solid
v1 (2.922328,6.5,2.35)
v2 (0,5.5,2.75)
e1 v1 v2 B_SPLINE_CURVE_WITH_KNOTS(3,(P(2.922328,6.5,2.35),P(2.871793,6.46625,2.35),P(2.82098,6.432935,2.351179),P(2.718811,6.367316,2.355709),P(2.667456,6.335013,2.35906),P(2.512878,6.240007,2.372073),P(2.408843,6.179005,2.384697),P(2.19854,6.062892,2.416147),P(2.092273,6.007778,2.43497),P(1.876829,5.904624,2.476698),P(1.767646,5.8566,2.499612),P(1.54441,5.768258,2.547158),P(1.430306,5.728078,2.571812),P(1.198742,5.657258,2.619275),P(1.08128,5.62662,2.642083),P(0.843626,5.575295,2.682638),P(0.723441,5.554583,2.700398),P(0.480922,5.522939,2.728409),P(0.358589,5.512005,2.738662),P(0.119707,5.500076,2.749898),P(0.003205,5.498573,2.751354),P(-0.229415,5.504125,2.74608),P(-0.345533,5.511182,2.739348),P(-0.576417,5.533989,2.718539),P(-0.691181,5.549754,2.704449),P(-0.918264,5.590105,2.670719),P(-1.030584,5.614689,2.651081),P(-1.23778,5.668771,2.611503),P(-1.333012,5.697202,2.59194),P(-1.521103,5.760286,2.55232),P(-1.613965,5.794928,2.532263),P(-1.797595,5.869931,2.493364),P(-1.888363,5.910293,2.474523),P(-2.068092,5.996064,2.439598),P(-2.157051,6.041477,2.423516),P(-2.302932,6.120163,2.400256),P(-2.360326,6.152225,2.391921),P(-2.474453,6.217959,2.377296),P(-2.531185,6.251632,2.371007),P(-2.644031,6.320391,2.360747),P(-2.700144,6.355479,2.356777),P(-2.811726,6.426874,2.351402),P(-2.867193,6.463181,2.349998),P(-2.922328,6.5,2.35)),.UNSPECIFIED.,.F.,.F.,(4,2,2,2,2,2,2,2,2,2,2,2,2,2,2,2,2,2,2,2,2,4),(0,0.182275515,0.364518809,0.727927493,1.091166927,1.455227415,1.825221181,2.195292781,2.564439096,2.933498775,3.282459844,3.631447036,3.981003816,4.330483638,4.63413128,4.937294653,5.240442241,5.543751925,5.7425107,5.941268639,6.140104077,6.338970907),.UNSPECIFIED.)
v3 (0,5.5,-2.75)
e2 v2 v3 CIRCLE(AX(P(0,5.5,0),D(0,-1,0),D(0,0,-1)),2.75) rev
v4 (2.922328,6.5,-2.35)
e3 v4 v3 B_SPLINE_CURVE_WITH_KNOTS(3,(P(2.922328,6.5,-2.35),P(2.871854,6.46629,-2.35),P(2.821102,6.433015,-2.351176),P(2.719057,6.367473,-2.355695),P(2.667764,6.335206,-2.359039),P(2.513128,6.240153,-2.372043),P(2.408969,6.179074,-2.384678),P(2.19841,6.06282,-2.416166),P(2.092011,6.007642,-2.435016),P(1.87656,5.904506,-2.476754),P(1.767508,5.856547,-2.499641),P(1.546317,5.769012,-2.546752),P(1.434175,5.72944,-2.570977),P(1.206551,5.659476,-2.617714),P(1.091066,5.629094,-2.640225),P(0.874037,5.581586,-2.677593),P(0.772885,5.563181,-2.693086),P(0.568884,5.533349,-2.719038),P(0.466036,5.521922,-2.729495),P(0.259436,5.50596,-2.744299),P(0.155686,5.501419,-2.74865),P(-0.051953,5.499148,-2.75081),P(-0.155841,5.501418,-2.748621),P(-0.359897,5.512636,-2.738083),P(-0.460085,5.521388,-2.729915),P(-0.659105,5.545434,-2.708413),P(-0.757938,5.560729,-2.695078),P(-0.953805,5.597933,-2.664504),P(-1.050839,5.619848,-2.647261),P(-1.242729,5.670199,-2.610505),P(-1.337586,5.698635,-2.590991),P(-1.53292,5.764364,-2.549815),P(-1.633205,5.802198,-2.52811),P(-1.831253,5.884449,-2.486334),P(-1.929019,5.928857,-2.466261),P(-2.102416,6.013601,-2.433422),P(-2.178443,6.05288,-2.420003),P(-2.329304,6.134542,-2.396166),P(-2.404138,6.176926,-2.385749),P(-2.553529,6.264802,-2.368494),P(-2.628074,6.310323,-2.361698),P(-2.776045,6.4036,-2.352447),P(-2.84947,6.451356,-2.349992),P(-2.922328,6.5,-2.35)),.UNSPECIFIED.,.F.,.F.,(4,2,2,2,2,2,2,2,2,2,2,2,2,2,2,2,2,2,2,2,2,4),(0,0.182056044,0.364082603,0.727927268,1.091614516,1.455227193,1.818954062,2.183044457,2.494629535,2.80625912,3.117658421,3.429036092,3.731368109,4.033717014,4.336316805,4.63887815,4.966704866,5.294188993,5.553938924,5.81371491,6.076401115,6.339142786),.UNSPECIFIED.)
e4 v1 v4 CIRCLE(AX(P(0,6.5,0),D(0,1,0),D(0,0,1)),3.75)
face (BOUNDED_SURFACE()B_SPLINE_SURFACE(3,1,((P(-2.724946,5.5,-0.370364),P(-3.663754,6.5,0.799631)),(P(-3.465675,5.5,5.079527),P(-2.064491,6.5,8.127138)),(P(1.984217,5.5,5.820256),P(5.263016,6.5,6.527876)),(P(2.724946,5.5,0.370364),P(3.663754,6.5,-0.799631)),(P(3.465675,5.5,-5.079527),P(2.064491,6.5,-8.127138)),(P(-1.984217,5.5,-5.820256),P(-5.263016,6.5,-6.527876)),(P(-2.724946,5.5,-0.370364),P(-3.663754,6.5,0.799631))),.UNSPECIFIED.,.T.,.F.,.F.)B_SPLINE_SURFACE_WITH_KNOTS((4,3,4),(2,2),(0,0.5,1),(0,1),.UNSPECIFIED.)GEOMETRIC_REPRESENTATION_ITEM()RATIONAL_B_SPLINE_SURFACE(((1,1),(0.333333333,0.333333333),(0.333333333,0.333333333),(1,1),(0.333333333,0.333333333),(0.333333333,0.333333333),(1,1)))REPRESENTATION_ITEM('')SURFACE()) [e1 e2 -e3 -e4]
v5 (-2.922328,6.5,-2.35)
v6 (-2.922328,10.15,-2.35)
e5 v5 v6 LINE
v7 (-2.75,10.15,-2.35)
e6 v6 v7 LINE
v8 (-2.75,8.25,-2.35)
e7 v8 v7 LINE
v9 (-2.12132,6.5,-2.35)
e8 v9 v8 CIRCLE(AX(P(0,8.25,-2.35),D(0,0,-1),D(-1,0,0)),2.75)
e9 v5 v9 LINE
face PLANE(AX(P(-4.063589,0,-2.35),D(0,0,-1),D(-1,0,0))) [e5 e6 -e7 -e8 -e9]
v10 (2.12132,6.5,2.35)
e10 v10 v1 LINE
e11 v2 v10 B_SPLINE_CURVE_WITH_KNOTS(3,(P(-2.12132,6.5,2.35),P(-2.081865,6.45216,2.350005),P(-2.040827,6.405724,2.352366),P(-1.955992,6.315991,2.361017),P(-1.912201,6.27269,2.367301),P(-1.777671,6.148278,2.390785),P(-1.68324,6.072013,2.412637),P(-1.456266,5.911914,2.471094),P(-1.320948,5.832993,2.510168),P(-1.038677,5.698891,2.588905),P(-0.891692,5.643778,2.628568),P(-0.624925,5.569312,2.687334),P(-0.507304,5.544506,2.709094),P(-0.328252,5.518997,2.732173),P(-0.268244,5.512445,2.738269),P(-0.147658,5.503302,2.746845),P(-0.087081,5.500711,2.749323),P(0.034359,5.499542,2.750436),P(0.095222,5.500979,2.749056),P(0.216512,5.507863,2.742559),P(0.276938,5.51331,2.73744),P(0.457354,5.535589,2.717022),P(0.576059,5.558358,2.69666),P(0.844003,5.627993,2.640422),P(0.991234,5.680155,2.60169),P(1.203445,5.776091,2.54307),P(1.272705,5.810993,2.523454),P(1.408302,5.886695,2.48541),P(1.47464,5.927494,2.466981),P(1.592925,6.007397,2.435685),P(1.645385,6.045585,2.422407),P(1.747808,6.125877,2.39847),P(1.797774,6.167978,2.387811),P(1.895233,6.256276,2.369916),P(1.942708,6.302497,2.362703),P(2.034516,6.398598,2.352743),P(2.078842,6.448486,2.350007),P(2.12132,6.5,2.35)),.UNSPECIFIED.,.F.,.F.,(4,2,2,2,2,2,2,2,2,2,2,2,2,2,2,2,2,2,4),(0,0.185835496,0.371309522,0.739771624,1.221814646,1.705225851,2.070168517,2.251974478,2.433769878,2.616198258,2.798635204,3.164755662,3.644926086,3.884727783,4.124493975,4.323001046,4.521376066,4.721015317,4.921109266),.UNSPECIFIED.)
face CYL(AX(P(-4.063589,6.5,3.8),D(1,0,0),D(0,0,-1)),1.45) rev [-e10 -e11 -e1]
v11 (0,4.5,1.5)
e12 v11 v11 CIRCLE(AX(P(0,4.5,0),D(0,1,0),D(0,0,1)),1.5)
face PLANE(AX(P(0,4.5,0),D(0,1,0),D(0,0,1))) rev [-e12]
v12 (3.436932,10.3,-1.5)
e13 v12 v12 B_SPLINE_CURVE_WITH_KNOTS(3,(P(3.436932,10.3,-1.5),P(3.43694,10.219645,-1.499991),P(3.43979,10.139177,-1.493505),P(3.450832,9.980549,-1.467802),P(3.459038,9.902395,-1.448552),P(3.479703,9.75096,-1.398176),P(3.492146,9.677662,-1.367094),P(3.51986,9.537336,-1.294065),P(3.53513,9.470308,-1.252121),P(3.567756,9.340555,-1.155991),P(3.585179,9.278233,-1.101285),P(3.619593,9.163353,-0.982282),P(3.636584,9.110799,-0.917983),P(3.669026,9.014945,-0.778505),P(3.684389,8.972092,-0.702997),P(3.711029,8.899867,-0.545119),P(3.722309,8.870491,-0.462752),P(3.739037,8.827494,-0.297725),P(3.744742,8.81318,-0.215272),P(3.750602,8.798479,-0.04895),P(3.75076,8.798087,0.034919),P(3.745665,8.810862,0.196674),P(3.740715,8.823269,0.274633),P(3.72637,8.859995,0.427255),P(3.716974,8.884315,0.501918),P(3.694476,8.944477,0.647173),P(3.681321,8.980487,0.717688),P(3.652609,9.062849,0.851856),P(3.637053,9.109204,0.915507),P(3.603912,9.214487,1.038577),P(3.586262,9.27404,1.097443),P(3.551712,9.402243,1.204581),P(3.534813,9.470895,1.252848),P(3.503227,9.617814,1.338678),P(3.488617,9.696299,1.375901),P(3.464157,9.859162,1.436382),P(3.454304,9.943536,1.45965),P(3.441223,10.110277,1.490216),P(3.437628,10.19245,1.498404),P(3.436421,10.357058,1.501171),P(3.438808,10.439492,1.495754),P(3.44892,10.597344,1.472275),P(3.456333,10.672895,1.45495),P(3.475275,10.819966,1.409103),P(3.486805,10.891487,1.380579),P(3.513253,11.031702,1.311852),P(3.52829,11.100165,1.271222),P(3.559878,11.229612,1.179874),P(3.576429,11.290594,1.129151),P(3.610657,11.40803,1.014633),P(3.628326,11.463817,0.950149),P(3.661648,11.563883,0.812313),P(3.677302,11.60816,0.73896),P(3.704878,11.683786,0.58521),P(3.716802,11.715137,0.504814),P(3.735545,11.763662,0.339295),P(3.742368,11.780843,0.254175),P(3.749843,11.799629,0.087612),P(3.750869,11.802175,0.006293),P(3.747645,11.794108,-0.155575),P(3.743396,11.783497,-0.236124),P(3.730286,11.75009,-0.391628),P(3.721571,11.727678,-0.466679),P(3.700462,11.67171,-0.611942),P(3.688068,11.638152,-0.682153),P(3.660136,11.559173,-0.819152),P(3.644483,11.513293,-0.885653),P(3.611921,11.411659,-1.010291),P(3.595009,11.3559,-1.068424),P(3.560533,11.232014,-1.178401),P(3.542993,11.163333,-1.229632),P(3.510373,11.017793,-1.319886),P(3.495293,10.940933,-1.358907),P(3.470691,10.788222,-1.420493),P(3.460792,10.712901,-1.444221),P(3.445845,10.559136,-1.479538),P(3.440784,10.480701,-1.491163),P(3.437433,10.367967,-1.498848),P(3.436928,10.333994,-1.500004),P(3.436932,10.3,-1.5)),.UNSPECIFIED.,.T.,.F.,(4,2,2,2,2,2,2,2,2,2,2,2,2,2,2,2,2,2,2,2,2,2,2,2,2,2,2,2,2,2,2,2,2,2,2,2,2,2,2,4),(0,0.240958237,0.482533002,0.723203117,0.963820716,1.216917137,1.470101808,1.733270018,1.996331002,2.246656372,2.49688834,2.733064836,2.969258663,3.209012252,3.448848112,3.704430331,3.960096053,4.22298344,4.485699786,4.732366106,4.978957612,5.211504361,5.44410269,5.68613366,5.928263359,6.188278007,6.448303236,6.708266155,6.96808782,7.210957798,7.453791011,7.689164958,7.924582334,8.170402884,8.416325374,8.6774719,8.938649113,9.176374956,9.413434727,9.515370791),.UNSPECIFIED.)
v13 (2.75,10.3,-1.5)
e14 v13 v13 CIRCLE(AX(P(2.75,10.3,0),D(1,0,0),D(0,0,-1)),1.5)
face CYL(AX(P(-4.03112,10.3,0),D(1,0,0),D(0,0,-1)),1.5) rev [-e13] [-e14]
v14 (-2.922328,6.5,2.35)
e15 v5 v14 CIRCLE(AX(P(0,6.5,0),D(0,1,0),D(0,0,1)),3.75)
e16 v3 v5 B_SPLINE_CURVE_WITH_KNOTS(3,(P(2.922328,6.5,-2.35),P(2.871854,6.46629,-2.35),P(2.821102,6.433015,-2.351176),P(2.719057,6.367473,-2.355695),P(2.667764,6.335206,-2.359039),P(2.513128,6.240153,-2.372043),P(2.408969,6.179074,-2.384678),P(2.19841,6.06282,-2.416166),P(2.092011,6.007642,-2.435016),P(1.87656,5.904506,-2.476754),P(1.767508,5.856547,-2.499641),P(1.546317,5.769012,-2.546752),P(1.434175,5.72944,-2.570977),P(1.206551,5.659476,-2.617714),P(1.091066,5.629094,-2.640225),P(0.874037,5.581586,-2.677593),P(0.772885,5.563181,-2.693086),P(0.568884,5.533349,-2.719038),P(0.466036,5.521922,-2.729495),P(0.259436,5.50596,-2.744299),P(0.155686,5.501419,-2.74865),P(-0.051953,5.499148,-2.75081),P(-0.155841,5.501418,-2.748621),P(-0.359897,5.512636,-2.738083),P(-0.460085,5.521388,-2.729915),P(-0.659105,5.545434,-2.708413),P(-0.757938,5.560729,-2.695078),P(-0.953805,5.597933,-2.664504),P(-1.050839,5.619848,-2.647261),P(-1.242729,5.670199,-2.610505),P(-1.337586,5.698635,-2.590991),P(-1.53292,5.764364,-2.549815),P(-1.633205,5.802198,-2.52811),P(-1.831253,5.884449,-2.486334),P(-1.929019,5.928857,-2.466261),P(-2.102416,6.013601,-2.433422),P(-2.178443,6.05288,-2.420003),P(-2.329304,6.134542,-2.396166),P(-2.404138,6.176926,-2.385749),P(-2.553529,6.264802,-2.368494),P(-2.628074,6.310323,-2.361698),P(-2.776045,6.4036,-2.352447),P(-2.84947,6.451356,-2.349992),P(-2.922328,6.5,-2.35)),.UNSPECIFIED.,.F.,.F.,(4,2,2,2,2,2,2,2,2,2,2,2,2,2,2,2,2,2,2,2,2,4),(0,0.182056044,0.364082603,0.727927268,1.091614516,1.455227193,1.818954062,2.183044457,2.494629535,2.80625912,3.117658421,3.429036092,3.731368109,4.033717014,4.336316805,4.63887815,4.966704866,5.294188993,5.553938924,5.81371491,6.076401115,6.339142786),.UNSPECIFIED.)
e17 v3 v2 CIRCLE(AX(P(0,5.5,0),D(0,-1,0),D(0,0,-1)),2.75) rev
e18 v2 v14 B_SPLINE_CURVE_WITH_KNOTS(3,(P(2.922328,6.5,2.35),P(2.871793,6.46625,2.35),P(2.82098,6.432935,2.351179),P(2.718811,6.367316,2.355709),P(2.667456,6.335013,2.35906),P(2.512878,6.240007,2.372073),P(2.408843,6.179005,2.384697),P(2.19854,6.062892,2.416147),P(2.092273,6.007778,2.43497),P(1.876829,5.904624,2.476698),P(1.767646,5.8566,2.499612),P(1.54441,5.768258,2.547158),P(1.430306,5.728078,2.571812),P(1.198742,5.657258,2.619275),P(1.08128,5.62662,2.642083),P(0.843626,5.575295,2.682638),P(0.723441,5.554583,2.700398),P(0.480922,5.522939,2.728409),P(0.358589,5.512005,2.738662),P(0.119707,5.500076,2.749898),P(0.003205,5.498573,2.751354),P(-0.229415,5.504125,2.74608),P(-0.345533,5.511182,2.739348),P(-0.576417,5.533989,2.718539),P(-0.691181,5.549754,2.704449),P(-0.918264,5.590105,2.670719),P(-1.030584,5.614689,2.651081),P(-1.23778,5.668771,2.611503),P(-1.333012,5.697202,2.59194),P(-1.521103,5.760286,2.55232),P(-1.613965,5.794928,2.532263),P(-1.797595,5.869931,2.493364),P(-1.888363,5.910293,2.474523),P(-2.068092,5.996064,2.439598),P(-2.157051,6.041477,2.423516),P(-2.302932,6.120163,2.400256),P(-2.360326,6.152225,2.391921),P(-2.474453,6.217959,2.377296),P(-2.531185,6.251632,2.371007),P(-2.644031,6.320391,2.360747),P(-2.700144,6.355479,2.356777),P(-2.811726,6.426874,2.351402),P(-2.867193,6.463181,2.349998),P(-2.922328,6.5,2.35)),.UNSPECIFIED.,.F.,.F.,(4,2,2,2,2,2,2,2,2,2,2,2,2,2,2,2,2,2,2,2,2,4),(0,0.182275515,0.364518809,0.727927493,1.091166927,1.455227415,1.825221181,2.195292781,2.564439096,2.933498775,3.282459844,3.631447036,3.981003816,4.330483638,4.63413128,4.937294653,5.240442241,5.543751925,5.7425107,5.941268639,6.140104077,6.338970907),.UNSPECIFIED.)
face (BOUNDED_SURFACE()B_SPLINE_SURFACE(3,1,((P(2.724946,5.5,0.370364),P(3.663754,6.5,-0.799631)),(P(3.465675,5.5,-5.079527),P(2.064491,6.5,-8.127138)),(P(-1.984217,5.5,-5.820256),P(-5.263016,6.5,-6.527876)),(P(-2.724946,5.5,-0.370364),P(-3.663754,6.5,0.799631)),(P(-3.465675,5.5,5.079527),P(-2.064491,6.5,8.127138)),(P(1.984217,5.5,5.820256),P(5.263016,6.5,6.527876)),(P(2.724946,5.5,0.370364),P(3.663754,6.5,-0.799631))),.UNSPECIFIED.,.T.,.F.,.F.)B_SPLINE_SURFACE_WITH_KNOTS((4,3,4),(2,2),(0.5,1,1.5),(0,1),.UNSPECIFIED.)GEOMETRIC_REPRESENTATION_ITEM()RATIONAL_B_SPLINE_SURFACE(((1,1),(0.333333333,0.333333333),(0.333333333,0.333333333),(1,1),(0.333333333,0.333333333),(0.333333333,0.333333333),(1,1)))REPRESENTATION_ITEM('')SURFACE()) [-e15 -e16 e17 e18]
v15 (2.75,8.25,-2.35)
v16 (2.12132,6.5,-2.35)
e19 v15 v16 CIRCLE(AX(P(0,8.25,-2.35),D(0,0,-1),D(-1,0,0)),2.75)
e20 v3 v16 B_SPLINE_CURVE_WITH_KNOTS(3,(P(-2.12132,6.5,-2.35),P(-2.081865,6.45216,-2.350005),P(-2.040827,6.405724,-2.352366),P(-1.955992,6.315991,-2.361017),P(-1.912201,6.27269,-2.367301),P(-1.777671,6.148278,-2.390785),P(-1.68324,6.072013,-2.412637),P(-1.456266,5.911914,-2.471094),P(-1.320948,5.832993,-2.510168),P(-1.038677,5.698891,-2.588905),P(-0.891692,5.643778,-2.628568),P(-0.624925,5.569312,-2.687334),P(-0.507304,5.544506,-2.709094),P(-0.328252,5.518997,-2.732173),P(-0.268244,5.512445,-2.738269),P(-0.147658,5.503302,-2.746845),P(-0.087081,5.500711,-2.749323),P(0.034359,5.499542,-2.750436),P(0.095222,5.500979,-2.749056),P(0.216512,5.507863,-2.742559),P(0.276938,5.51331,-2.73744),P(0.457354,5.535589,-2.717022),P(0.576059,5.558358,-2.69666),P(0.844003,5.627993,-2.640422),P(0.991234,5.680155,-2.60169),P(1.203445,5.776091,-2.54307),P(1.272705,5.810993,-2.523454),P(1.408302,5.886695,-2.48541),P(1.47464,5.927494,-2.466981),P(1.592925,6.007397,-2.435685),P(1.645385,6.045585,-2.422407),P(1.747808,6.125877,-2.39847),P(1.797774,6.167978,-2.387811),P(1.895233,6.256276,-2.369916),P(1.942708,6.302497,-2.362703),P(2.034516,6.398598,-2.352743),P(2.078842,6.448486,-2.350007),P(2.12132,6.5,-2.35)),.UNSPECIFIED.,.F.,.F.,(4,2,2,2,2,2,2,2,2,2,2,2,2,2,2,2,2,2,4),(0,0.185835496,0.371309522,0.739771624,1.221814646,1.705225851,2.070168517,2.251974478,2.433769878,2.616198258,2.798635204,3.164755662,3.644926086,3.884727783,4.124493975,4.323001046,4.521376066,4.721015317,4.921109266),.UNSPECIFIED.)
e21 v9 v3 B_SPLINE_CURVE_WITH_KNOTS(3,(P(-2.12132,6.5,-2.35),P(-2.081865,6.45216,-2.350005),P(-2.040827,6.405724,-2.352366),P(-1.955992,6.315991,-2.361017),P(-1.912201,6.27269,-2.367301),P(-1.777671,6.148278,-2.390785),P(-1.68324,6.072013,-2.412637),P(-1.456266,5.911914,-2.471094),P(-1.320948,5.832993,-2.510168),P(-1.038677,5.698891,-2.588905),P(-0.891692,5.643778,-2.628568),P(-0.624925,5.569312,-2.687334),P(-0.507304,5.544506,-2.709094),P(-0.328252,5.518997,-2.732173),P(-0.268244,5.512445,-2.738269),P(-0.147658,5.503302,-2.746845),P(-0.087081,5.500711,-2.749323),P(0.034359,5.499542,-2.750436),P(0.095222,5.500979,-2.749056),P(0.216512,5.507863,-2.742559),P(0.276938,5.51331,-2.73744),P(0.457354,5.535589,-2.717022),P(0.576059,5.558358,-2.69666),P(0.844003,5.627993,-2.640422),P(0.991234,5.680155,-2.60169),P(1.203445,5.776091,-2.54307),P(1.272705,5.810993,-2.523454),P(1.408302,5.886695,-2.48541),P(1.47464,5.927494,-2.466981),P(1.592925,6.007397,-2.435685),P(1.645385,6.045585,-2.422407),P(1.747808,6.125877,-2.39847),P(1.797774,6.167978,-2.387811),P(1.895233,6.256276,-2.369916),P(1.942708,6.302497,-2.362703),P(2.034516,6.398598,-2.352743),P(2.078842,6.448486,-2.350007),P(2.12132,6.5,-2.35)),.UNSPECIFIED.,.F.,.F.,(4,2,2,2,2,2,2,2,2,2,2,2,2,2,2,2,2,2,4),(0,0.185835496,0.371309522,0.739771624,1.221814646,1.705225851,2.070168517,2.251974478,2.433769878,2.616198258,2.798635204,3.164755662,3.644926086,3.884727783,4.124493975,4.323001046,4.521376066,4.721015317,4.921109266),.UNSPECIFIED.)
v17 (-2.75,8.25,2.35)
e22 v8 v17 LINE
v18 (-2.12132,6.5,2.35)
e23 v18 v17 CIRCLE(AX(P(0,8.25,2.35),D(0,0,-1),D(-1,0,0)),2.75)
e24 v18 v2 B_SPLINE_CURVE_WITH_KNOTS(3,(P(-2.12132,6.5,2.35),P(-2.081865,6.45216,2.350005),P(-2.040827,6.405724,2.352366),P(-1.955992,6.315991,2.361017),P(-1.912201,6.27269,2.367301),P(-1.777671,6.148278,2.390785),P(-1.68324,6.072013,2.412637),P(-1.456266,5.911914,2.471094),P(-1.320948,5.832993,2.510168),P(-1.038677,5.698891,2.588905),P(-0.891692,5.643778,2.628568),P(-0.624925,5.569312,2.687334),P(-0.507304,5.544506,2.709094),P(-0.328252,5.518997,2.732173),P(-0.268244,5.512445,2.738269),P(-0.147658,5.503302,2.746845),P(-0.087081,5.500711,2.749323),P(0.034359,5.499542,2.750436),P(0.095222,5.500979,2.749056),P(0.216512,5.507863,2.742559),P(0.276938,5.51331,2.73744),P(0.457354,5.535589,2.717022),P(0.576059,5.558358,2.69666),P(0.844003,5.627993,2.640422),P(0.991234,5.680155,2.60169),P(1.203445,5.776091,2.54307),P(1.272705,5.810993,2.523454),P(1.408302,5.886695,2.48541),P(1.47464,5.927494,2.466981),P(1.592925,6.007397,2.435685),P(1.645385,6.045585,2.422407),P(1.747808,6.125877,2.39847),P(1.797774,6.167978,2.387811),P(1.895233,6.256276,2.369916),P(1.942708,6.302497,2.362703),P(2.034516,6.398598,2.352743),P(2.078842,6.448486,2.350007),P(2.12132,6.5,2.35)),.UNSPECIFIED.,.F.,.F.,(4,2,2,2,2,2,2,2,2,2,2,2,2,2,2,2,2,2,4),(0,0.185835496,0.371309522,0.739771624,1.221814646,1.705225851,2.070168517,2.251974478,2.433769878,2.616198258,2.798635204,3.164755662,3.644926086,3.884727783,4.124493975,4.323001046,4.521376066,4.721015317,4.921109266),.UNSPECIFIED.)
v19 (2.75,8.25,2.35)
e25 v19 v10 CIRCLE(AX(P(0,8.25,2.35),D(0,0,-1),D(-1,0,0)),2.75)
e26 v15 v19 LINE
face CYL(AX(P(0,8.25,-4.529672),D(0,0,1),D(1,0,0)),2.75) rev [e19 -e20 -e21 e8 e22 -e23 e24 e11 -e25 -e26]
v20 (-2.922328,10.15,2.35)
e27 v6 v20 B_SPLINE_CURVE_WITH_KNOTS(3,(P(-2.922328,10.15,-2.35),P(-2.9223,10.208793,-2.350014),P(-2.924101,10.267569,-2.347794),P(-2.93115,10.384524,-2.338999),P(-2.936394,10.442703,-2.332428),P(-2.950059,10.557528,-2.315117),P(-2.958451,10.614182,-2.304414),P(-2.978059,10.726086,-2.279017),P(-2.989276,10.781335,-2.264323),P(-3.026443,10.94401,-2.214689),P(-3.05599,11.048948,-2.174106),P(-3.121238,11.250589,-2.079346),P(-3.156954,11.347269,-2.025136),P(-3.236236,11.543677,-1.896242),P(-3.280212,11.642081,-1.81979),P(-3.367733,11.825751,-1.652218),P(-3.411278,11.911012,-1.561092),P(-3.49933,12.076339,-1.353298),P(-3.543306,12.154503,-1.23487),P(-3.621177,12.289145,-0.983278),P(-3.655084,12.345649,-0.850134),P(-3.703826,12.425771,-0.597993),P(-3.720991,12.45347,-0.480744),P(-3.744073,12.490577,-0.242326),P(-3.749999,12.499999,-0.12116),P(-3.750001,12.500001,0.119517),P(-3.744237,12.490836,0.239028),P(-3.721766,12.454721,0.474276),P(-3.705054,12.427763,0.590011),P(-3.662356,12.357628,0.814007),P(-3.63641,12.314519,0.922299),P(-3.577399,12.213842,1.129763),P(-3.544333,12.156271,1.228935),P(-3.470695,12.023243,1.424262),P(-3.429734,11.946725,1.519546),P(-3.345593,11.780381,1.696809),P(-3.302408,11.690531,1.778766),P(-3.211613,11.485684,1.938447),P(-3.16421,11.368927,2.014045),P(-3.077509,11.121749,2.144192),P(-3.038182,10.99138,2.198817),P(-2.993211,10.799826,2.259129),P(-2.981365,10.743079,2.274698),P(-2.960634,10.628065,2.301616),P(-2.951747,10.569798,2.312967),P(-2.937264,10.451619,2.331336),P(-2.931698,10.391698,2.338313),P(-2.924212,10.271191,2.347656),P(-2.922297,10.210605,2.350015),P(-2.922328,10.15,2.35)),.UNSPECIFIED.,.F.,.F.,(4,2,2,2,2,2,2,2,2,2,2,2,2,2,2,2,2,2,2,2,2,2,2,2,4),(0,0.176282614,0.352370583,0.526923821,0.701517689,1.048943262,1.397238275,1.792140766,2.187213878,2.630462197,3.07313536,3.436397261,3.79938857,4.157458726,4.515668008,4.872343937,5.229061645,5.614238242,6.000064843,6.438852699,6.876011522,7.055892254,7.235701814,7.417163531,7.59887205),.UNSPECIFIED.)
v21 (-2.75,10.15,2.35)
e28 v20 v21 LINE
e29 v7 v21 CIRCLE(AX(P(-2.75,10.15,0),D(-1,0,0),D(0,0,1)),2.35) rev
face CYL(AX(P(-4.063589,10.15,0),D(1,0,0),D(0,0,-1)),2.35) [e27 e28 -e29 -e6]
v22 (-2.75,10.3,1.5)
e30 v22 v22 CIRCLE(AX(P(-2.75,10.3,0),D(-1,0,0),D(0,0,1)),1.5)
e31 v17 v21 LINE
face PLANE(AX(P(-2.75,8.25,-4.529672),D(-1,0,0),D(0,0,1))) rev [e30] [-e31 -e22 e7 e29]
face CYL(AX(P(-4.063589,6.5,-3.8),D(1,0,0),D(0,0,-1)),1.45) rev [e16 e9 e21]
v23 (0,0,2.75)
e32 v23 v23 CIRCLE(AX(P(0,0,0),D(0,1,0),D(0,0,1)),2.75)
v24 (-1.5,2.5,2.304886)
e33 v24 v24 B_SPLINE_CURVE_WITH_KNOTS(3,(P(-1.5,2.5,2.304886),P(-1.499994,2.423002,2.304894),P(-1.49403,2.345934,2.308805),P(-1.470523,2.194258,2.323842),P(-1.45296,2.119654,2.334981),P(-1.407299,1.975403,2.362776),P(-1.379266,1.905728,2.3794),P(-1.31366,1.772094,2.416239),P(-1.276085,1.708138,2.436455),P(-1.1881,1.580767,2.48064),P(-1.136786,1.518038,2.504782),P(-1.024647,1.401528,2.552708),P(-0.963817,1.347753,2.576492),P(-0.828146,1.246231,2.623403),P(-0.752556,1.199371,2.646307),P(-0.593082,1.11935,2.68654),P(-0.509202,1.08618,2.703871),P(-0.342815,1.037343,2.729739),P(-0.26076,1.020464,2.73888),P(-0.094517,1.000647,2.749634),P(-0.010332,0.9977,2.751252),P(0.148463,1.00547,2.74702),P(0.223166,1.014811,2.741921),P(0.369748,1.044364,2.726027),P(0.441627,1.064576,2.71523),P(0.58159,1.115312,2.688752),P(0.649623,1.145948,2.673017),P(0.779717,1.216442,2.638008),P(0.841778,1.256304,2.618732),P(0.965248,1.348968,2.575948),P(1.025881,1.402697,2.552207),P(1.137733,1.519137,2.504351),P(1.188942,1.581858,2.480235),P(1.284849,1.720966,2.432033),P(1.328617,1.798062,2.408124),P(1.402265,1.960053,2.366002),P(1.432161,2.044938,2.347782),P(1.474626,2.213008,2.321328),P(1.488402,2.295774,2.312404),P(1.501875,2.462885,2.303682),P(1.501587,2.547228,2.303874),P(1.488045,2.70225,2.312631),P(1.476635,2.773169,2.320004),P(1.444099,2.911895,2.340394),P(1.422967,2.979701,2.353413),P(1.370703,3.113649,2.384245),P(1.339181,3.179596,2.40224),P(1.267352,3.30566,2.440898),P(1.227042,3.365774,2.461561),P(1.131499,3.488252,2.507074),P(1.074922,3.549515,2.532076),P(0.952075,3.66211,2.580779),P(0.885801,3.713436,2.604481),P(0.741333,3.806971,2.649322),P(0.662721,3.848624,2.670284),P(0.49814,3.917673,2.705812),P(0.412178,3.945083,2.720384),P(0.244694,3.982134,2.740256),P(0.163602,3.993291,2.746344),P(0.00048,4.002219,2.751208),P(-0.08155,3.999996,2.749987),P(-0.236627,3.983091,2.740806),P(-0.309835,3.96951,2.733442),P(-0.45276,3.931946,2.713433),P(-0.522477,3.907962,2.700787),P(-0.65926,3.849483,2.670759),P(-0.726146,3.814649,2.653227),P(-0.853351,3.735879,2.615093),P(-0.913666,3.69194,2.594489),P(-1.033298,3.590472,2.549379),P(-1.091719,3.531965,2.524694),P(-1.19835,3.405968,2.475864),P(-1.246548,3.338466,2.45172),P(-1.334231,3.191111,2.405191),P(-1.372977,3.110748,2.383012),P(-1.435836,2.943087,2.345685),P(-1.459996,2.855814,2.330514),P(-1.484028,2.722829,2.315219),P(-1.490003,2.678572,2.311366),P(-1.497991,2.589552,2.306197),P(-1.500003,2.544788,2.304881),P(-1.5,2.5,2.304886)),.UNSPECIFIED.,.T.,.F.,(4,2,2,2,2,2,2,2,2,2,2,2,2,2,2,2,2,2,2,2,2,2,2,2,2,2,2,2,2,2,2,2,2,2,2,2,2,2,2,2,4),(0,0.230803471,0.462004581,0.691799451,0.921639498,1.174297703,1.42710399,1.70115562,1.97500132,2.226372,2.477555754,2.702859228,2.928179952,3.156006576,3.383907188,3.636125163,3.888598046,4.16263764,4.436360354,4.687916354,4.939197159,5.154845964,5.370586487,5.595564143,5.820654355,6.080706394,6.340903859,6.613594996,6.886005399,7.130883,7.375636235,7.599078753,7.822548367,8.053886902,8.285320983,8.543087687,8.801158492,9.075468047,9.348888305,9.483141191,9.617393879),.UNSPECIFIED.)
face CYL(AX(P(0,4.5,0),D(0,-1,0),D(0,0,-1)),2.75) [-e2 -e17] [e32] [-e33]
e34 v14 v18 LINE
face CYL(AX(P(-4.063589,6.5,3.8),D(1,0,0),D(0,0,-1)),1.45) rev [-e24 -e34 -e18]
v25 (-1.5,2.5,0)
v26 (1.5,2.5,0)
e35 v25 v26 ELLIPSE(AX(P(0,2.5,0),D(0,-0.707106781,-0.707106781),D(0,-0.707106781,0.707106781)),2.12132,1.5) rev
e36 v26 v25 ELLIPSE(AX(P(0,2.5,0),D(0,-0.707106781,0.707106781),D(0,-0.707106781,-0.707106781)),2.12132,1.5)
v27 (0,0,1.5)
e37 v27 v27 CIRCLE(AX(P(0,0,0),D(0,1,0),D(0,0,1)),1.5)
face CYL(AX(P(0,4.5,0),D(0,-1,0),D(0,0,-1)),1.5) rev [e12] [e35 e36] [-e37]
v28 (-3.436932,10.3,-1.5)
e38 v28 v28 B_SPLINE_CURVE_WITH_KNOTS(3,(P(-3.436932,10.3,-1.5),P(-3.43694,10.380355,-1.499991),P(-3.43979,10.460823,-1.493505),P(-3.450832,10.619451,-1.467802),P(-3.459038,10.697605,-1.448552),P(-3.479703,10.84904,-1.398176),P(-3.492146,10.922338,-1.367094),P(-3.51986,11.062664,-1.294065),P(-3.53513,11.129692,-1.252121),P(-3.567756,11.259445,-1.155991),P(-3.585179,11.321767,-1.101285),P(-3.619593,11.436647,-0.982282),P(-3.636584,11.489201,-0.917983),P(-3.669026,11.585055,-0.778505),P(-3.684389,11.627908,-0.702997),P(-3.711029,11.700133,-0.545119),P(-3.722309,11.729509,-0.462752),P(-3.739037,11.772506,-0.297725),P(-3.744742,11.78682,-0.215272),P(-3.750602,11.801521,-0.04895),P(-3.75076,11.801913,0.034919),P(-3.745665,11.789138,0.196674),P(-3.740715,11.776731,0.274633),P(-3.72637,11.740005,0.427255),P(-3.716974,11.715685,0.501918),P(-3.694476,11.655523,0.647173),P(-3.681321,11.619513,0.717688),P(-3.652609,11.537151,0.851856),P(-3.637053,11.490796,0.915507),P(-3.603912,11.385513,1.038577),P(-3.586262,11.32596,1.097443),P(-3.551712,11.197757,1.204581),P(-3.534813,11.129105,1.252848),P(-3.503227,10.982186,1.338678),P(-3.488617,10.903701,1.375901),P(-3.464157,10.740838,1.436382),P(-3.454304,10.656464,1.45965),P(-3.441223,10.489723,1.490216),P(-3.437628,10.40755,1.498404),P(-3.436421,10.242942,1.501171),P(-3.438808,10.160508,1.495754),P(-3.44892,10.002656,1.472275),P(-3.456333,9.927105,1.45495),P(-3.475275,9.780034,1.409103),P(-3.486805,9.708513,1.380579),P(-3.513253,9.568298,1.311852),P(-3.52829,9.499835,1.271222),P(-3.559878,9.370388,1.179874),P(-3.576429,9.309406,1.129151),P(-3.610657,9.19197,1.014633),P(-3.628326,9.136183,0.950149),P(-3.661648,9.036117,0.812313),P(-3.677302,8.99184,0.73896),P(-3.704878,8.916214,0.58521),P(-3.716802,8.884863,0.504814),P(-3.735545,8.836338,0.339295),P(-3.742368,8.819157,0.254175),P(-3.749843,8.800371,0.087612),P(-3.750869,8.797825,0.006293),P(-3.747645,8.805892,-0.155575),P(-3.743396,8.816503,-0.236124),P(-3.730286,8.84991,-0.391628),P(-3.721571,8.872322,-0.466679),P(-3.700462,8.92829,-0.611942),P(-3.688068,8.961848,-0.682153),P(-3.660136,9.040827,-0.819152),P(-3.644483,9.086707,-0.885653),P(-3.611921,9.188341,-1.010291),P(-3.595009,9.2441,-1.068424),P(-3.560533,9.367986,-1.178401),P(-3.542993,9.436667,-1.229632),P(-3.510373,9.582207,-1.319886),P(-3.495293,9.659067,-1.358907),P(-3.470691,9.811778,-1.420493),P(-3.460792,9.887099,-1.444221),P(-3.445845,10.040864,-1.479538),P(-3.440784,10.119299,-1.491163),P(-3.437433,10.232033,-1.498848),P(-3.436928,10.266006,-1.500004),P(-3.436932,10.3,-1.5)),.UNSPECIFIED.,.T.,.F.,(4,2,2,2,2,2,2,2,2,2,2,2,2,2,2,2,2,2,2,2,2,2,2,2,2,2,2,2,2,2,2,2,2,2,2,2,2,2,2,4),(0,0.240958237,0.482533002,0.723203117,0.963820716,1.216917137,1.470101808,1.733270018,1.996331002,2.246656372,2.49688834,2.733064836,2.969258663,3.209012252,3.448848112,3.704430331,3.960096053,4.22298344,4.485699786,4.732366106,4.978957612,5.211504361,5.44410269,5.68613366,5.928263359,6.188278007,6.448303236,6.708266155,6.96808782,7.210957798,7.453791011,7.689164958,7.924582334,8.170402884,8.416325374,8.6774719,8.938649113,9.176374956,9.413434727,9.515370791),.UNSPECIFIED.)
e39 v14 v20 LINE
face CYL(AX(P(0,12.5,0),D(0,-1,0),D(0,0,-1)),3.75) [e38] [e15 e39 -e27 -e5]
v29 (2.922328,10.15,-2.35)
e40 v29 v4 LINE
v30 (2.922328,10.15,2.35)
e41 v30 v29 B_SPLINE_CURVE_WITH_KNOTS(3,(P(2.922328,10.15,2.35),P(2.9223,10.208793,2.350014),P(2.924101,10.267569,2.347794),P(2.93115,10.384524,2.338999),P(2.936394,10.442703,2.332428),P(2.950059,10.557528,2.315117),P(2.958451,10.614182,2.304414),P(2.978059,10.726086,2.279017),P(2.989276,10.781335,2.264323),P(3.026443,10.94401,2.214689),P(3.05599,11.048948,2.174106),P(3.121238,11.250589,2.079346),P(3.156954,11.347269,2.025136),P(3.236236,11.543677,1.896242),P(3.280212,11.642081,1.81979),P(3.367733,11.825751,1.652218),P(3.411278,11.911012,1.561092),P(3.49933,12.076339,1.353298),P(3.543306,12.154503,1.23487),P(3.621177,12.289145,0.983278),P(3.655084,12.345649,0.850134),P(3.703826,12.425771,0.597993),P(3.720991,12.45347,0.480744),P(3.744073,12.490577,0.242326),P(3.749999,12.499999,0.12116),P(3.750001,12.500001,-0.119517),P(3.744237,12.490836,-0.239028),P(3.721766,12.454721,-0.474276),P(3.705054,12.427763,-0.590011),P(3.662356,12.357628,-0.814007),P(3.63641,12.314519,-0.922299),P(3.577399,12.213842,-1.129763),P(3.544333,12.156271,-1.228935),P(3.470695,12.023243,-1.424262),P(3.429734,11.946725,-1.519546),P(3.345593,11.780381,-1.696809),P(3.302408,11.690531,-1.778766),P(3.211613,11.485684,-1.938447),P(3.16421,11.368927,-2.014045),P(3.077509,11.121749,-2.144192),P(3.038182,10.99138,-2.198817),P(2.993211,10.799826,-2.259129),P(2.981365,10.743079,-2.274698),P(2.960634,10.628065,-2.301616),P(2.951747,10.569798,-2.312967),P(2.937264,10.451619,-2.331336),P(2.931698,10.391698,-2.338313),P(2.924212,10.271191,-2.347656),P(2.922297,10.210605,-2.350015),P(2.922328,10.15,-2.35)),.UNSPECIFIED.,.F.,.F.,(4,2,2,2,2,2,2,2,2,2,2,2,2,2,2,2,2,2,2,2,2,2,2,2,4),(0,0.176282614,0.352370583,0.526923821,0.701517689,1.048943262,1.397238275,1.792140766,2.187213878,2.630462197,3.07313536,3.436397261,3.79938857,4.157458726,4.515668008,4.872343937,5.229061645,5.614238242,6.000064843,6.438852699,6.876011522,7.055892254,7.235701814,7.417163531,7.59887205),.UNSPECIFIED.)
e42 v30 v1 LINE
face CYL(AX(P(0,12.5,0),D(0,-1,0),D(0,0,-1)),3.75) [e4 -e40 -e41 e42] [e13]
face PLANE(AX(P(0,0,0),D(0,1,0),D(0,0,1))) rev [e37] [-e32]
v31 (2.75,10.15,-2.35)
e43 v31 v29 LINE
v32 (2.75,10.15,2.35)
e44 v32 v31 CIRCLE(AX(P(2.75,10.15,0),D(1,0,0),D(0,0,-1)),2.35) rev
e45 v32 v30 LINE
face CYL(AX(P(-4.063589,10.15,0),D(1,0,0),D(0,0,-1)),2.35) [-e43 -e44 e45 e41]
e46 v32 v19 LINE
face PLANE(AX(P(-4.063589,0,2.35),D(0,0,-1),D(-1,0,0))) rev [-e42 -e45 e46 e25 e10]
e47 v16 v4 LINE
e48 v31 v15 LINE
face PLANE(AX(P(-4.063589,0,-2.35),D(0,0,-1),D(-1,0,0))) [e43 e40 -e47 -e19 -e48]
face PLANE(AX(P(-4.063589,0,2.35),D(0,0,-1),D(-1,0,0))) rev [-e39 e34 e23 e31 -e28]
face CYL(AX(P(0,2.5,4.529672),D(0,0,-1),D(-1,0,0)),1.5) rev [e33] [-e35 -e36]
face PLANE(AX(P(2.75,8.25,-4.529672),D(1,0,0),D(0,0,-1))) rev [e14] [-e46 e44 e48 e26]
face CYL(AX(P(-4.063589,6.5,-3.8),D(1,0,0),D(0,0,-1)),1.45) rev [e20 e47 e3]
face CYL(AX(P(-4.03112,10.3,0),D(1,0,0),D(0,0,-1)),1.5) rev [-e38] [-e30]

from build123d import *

# Parameters (mm, degrees)
SKETCH1_R               = 2.75
SKETCH1_R_2             = 1.5
BOSS_EXTRUDE1_DEPTH     = 4.5
SKETCH2_R               = 2.75
BOSS_EXTRUDE2_DEPTH     = 1
SKETCH4_R               = 3.75
BOSS_EXTRUDE3_DEPTH     = 6
CUT_EXTRUDE2_DEPTH      = 14.578475761
CUT_EXTRUDE2_DEPTH_BACK = 14.578475761
CUT_EXTRUDE3_DEPTH      = 14.336978811
CUT_EXTRUDE3_DEPTH_BACK = 14.336978811
CUT_EXTRUDE4_DEPTH      = 14.336978811
CUT_EXTRUDE4_DEPTH_BACK = 14.336978811
SKETCH7_R               = 1.5
SKETCH9_R               = 1.5
CUT_EXTRUDE5_DEPTH      = 14.336978811


with BuildPart() as part:
    # Sketch1 → Boss-Extrude1 (new body)
    with BuildSketch(Plane(origin=(0, 0, 0), x_dir=(1, 0, 0), z_dir=(0, 1, 0))):
        with Locations(Location((0, 0, 0), (0, 0, 270))):
            Circle(SKETCH1_R)
        with Locations(Location((0, 0, 0), (0, 0, 270))):
            Circle(SKETCH1_R_2, mode=Mode.SUBTRACT)
    extrude(amount=BOSS_EXTRUDE1_DEPTH)

    # Sketch2 → Boss-Extrude2 (add)
    with BuildSketch(Plane(origin=(0, 4.5, 0), x_dir=(1, 0, 0), z_dir=(0, 1, 0))):
        with Locations(Location((0, 0, 0), (0, 0, 270))):
            Circle(SKETCH2_R)
    extrude(amount=BOSS_EXTRUDE2_DEPTH)

    # Loft1: read off the stored shape, not the designer's step
    # Loft1: loft between two sections, ruled curve by curve
    loft1_from = [
        Edge.make_bspline([(-2.7249459, 5.5, -0.370364471), (-3.465674842, 5.5, 5.079527329), (1.984216958, 5.5, 5.820256271), (2.7249459, 5.5, 0.370364471), (3.465674842, 5.5, -5.079527329), (-1.984216958, 5.5, -5.820256271), (-2.7249459, 5.5, -0.370364471)], [0, 0, 0, 0, 0.5, 0.5, 0.5, 1, 1, 1, 1], 3, [1, 0.333333333, 0.333333333, 1, 0.333333333, 0.333333333, 1]),
    ]
    loft1_to = [
        Edge.make_bspline([(-3.66375351, 6.5, 0.799631301), (-2.064490908, 6.5, 8.127138321), (5.263016112, 6.5, 6.527875719), (3.66375351, 6.5, -0.799631301), (2.064490908, 6.5, -8.127138321), (-5.263016112, 6.5, -6.527875719), (-3.66375351, 6.5, 0.799631301)], [0, 0, 0, 0, 0.5, 0.5, 0.5, 1, 1, 1, 1], 3, [1, 0.333333333, 0.333333333, 1, 0.333333333, 0.333333333, 1]),
    ]
    loft1 = Solid(Shell([*[Face.make_surface_from_curves(loft1_from[k], loft1_to[k]) for k in range(1)], Face(Wire(loft1_from)), Face(Wire(loft1_to))]))
    add(loft1)

    # Sketch4 → Boss-Extrude3 (add)
    with BuildSketch(Plane(origin=(0, 6.5, 0), x_dir=(1, 0, 0), z_dir=(0, 1, 0))):
        with Locations(Location((0, 0, 0), (0, 0, 192.312))):
            Circle(SKETCH4_R)
    extrude(amount=BOSS_EXTRUDE3_DEPTH)

    # Sketch5 → Cut-Extrude2 (cut, two sides: drawn at the far end of the back side and taken through both)
    with BuildSketch(Plane(origin=(0, 0, 0), x_dir=(0, 0, -1), z_dir=(1, 0, 0)).offset(-CUT_EXTRUDE2_DEPTH_BACK)):
        with BuildLine():
            Line((2.35, 10.15), (2.35, 6.5))
            ThreePointArc((2.35, 6.5), (2.453708798, 5.961483519), (2.75, 5.5))
            Line((2.75, 5.5), (3.75, 6.5))
            Line((3.75, 6.5), (3.75, 12.5))
            Line((3.75, 12.5), (0, 12.5))
            ThreePointArc((0, 12.5), (1.661700936, 11.811700936), (2.35, 10.15))
        make_face()
        with BuildLine():
            ThreePointArc((-2.35, 10.15), (-1.661700936, 11.811700936), (0, 12.5))
            Line((0, 12.5), (-3.75, 12.5))
            Line((-3.75, 12.5), (-3.75, 6.5))
            Line((-3.75, 6.5), (-2.75, 5.5))
            ThreePointArc((-2.75, 5.5), (-2.453708798, 5.961483519), (-2.35, 6.5))
            Line((-2.35, 6.5), (-2.35, 10.15))
        make_face()
    extrude(amount=CUT_EXTRUDE2_DEPTH + CUT_EXTRUDE2_DEPTH_BACK, mode=Mode.SUBTRACT)

    # Sketch6 → Cut-Extrude3 (cut, two sides: drawn at the far end of the back side and taken through both)
    with BuildSketch(Plane.XY.offset(-CUT_EXTRUDE3_DEPTH_BACK)):
        with BuildLine():
            Line((2.75, 8.25), (2.75, 12.5))
            Line((2.75, 12.5), (-2.75, 12.5))
            Line((-2.75, 12.5), (-2.75, 8.25))
            ThreePointArc((-2.75, 8.25), (0, 5.5), (2.75, 8.25))
        make_face()
    extrude(amount=CUT_EXTRUDE3_DEPTH + CUT_EXTRUDE3_DEPTH_BACK, mode=Mode.SUBTRACT)

    # Sketch7 → Cut-Extrude4 (cut, two sides: drawn at the far end of the back side and taken through both)
    with BuildSketch(Plane(origin=(0, 0, 0), x_dir=(0, 0, -1), z_dir=(1, 0, 0)).offset(-CUT_EXTRUDE4_DEPTH_BACK)):
        with Locations((0, 10.3)):
            Circle(SKETCH7_R)
    extrude(amount=CUT_EXTRUDE4_DEPTH + CUT_EXTRUDE4_DEPTH_BACK, mode=Mode.SUBTRACT)

    # Sketch9 → Cut-Extrude5 (cut, through all)
    with BuildSketch(Plane.XY):
        with Locations(Location((0, 2.5, 0), (0, 0, 180))):
            Circle(SKETCH9_R)
    extrude(amount=CUT_EXTRUDE5_DEPTH, mode=Mode.SUBTRACT)


solid = part.part
